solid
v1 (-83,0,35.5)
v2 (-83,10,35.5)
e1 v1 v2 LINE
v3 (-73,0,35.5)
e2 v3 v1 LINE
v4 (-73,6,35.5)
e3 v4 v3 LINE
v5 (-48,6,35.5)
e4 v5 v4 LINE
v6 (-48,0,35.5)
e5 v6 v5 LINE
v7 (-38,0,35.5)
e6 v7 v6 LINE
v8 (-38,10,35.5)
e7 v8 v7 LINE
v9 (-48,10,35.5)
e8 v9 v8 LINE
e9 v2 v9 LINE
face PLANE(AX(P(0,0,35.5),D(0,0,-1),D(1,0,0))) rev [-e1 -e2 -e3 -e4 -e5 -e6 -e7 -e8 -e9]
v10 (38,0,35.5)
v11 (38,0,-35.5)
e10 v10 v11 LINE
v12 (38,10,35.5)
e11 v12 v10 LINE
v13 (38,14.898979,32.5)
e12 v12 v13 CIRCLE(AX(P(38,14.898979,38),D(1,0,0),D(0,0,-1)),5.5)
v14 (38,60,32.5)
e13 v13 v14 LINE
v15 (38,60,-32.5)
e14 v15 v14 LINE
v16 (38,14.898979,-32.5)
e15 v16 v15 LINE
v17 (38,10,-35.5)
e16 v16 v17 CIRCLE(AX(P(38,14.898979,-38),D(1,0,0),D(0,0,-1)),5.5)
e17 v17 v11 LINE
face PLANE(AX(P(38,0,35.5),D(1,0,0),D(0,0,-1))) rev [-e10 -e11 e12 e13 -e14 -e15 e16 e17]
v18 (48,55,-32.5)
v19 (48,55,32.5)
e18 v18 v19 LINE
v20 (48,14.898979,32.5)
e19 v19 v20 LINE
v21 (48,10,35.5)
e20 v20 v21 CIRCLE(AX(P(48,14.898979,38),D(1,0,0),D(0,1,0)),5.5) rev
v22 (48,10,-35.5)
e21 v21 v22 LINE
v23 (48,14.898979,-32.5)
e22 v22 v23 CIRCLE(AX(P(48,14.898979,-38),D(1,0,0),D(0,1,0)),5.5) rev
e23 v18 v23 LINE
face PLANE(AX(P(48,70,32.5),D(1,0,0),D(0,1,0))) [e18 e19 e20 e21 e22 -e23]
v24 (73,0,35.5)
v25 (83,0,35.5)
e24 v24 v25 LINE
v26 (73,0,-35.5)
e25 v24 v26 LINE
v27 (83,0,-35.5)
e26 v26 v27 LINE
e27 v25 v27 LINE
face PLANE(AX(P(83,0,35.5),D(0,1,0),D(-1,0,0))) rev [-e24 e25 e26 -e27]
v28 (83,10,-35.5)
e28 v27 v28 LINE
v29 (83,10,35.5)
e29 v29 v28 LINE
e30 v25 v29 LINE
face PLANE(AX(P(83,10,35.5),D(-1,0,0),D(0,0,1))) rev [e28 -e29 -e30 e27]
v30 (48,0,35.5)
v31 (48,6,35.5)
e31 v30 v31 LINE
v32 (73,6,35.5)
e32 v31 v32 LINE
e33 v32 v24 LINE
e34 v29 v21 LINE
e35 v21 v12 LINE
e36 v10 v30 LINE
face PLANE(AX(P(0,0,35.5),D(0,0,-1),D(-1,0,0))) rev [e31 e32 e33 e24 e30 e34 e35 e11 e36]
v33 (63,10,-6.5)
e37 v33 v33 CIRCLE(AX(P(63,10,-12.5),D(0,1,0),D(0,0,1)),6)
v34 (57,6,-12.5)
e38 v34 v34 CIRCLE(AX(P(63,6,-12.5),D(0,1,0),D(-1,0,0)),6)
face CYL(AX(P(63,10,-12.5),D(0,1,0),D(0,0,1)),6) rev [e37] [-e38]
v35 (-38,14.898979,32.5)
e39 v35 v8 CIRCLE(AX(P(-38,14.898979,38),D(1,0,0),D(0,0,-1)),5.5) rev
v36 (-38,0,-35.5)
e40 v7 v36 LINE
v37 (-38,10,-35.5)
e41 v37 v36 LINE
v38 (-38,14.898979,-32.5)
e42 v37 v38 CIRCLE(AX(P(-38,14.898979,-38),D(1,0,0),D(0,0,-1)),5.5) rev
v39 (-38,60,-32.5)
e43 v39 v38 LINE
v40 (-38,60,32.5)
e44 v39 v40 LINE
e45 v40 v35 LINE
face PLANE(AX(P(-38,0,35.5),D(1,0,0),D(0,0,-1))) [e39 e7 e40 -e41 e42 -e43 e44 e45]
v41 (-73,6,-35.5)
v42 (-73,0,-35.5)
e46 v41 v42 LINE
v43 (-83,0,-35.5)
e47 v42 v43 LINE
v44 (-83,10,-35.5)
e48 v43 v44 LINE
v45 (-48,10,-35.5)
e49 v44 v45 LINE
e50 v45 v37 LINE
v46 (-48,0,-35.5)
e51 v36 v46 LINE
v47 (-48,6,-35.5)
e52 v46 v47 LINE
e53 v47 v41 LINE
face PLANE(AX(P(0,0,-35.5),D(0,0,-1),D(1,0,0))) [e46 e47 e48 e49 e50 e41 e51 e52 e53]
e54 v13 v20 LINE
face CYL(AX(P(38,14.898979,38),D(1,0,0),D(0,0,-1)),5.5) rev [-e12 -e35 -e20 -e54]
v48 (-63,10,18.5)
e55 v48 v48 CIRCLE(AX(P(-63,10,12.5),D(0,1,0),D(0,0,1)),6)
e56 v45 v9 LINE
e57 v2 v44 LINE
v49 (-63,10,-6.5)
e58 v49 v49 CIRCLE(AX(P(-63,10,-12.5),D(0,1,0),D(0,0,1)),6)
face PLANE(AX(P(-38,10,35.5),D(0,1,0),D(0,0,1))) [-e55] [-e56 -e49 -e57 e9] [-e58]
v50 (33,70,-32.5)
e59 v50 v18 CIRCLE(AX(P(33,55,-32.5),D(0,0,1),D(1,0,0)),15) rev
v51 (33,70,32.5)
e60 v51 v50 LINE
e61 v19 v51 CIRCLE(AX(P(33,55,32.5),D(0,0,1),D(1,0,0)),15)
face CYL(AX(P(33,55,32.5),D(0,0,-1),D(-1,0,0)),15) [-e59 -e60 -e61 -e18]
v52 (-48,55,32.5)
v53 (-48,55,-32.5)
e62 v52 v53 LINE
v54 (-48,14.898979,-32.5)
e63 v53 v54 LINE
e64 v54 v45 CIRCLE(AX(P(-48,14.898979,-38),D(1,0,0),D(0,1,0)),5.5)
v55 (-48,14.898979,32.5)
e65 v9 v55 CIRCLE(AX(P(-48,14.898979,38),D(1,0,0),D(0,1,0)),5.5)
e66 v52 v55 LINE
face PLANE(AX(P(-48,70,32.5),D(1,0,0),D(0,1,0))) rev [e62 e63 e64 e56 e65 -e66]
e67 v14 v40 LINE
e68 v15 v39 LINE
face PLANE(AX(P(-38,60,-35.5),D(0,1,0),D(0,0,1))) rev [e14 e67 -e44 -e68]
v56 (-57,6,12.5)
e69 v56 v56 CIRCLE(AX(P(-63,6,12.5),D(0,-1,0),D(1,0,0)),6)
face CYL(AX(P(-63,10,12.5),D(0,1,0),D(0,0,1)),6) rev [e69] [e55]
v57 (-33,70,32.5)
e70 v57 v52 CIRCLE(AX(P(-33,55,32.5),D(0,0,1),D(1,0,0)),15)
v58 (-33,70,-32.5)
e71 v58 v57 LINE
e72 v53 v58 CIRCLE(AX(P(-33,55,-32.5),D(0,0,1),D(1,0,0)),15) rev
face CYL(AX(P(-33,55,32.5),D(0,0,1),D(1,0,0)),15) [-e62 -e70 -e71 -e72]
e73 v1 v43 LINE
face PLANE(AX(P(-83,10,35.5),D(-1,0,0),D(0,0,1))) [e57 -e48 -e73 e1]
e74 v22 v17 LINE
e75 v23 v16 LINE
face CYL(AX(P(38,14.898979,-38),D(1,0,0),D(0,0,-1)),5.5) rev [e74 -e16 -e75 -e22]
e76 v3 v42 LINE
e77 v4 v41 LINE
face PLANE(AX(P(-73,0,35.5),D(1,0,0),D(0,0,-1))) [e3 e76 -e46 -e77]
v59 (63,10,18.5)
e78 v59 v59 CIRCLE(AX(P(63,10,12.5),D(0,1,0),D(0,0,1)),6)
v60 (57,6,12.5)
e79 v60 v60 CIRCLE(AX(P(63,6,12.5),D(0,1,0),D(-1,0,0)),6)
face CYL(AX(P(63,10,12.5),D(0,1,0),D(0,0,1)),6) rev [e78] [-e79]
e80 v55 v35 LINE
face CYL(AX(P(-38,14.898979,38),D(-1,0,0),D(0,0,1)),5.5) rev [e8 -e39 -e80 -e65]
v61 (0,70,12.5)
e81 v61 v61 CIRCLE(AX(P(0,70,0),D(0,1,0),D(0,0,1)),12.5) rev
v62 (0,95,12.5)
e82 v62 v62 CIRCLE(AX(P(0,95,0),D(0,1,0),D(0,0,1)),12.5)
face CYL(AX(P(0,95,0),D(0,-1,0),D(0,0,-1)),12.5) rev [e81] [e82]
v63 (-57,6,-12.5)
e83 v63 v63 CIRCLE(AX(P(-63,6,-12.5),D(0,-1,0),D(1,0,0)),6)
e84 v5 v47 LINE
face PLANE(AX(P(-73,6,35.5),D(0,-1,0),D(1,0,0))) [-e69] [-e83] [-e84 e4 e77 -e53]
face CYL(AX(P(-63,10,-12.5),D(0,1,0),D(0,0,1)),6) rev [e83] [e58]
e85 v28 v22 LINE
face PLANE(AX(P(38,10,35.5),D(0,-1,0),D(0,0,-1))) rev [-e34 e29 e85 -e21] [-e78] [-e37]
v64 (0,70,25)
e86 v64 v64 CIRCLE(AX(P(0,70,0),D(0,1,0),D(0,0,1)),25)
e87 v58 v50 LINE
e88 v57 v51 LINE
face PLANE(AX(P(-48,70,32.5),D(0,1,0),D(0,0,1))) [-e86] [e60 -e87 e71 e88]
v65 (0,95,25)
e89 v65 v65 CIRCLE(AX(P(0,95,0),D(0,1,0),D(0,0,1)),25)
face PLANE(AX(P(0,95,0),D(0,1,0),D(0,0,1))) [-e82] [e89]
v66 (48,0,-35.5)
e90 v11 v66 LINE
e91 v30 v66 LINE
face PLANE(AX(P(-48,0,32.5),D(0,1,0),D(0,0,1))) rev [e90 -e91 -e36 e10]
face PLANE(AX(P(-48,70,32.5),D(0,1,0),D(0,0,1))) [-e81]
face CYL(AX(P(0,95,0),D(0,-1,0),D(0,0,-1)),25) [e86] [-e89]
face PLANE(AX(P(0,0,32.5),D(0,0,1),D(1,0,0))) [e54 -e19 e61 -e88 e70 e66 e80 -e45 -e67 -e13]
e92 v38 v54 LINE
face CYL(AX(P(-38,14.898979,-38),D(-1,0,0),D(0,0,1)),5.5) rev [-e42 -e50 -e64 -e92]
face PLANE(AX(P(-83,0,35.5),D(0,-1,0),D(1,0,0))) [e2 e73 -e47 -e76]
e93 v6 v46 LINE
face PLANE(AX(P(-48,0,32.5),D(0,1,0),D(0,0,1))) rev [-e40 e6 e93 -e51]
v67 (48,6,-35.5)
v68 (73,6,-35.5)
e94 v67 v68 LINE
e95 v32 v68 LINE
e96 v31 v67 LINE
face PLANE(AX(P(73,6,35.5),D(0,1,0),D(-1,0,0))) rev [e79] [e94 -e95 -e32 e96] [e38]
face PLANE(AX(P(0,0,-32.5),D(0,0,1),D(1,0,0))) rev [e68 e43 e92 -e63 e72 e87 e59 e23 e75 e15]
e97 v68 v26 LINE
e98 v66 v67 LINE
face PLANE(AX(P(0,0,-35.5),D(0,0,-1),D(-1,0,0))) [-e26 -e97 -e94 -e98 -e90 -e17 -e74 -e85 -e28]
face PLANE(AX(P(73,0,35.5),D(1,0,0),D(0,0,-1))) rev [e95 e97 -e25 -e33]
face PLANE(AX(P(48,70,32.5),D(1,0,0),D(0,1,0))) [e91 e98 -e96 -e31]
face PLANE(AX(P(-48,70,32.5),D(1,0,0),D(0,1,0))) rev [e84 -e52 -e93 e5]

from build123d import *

# Parameters (mm, degrees)
SKETCH1_W           = 96
SKETCH1_H           = 70
BOSS_EXTRUDE1_DEPTH = 32.5
BOSS_EXTRUDE2_DEPTH = 35.5
SKETCH3_W           = 76
SKETCH3_H           = 60
CUT_EXTRUDE1_DEPTH  = 129.113231167
FILLET1_R           = 15
FILLET2_R           = 5.5
SKETCH4_R           = 25
SKETCH4_R_2         = 12.5
BOSS_EXTRUDE3_DEPTH = 25
HOLE1_D             = 12


with BuildPart() as part:
    # Sketch1 → Boss-Extrude1 (new, symmetric)
    with BuildSketch(Plane.XY):
        with Locations((0, 35)):
            Rectangle(SKETCH1_W, SKETCH1_H)
    extrude(amount=BOSS_EXTRUDE1_DEPTH, both=True)

    # Sketch2 → Boss-Extrude2 (add, symmetric)
    with BuildSketch(Plane.XY):
        Polygon((38, 0), (38, 10), (83, 10), (83, 0), (73, 0), (73, 6), (48, 6), (48, 0), align=None)
    boss_extrude2 = extrude(amount=BOSS_EXTRUDE2_DEPTH, both=True)

    # Mirror1: Boss-Extrude2 across plane
    add(boss_extrude2.mirror(Plane(origin=(0, 0, 0), x_dir=(0, 0, 1), z_dir=(1, 0, 0))))

    # Sketch3 → Cut-Extrude1 (cut, through all)
    with BuildSketch(Plane.XY.offset(32.5)):
        with Locations((0, 30)):
            Rectangle(SKETCH3_W, SKETCH3_H)
    extrude(amount=-CUT_EXTRUDE1_DEPTH, mode=Mode.SUBTRACT)

    # Fillet1
    fillet1_edges = [part.edges().sort_by_distance(p)[0] for p in [
        (-48, 70, 0),
        (48, 70, 0),
    ]]
    fillet(fillet1_edges, radius=FILLET1_R)

    # Fillet2
    # the kernel refuses this fillet: 5.5 mm, written as the material it adds along each edge
    with BuildSketch(Plane(origin=(-48, 10, -32.5), x_dir=(0, 1, 0), z_dir=(1, 0, 0)), Plane(origin=(48, 10, 32.5), x_dir=(0, 1, 0), z_dir=(-1, 0, 0))) as fillet2_piece_1:
        with BuildLine():
            CenterArc((4.898979486, -5.5), FILLET2_R, 90, 62.964308211)
            Line((0, -3), (-0.09797959, -2.95))
            ThreePointArc((-0.09797959, -2.95), (-0.11, -1.5), (-0.11, 0))
            Line((-0.11, 0), (0, 0.11))
            Line((0, 0.11), (4.898979486, 0.11))
            Line((4.898979486, 0.11), (4.898979486, 0))
        make_face()
    extrude(amount=10)
    with BuildSketch(Plane(origin=(48, 10, -32.5), x_dir=(0, 1, 0), z_dir=(-1, 0, 0)), Plane(origin=(-48, 10, 32.5), x_dir=(0, 1, 0), z_dir=(1, 0, 0))) as fillet2_piece_2:
        with BuildLine():
            CenterArc((4.898979486, 5.5), FILLET2_R, 207.035691789, 62.964308211)
            Line((0, 3), (-0.09797959, 2.95))
            ThreePointArc((-0.09797959, 2.95), (-0.11, 1.5), (-0.11, 0))
            Line((-0.11, 0), (0, -0.11))
            Line((0, -0.11), (4.898979486, -0.11))
            Line((4.898979486, -0.11), (4.898979486, 0))
        make_face()
    extrude(amount=10)

    # Sketch4 → Boss-Extrude3 (add)
    with BuildSketch(Plane(origin=(0, 70, 0), x_dir=(1, 0, 0), z_dir=(0, 1, 0))):
        with Locations(Location((0, 0, 0), (0, 0, 270))):
            Circle(SKETCH4_R)
        with Locations(Location((0, 0, 0), (0, 0, 270))):
            Circle(SKETCH4_R_2, mode=Mode.SUBTRACT)
    extrude(amount=BOSS_EXTRUDE3_DEPTH)

    # Hole1 (through all)
    with Locations(Plane(origin=(0, 10, 0), x_dir=(1, 0, 0), z_dir=(0, 1, 0))):
        with Locations((63, 12.5), (63, -12.5)):
            hole1 = Hole(HOLE1_D / 2)

    # Mirror2: Hole1 across plane
    add(hole1.mirror(Plane(origin=(0, 0, 0), x_dir=(0, 0, 1), z_dir=(1, 0, 0))), mode=Mode.SUBTRACT)


solid = part.part
